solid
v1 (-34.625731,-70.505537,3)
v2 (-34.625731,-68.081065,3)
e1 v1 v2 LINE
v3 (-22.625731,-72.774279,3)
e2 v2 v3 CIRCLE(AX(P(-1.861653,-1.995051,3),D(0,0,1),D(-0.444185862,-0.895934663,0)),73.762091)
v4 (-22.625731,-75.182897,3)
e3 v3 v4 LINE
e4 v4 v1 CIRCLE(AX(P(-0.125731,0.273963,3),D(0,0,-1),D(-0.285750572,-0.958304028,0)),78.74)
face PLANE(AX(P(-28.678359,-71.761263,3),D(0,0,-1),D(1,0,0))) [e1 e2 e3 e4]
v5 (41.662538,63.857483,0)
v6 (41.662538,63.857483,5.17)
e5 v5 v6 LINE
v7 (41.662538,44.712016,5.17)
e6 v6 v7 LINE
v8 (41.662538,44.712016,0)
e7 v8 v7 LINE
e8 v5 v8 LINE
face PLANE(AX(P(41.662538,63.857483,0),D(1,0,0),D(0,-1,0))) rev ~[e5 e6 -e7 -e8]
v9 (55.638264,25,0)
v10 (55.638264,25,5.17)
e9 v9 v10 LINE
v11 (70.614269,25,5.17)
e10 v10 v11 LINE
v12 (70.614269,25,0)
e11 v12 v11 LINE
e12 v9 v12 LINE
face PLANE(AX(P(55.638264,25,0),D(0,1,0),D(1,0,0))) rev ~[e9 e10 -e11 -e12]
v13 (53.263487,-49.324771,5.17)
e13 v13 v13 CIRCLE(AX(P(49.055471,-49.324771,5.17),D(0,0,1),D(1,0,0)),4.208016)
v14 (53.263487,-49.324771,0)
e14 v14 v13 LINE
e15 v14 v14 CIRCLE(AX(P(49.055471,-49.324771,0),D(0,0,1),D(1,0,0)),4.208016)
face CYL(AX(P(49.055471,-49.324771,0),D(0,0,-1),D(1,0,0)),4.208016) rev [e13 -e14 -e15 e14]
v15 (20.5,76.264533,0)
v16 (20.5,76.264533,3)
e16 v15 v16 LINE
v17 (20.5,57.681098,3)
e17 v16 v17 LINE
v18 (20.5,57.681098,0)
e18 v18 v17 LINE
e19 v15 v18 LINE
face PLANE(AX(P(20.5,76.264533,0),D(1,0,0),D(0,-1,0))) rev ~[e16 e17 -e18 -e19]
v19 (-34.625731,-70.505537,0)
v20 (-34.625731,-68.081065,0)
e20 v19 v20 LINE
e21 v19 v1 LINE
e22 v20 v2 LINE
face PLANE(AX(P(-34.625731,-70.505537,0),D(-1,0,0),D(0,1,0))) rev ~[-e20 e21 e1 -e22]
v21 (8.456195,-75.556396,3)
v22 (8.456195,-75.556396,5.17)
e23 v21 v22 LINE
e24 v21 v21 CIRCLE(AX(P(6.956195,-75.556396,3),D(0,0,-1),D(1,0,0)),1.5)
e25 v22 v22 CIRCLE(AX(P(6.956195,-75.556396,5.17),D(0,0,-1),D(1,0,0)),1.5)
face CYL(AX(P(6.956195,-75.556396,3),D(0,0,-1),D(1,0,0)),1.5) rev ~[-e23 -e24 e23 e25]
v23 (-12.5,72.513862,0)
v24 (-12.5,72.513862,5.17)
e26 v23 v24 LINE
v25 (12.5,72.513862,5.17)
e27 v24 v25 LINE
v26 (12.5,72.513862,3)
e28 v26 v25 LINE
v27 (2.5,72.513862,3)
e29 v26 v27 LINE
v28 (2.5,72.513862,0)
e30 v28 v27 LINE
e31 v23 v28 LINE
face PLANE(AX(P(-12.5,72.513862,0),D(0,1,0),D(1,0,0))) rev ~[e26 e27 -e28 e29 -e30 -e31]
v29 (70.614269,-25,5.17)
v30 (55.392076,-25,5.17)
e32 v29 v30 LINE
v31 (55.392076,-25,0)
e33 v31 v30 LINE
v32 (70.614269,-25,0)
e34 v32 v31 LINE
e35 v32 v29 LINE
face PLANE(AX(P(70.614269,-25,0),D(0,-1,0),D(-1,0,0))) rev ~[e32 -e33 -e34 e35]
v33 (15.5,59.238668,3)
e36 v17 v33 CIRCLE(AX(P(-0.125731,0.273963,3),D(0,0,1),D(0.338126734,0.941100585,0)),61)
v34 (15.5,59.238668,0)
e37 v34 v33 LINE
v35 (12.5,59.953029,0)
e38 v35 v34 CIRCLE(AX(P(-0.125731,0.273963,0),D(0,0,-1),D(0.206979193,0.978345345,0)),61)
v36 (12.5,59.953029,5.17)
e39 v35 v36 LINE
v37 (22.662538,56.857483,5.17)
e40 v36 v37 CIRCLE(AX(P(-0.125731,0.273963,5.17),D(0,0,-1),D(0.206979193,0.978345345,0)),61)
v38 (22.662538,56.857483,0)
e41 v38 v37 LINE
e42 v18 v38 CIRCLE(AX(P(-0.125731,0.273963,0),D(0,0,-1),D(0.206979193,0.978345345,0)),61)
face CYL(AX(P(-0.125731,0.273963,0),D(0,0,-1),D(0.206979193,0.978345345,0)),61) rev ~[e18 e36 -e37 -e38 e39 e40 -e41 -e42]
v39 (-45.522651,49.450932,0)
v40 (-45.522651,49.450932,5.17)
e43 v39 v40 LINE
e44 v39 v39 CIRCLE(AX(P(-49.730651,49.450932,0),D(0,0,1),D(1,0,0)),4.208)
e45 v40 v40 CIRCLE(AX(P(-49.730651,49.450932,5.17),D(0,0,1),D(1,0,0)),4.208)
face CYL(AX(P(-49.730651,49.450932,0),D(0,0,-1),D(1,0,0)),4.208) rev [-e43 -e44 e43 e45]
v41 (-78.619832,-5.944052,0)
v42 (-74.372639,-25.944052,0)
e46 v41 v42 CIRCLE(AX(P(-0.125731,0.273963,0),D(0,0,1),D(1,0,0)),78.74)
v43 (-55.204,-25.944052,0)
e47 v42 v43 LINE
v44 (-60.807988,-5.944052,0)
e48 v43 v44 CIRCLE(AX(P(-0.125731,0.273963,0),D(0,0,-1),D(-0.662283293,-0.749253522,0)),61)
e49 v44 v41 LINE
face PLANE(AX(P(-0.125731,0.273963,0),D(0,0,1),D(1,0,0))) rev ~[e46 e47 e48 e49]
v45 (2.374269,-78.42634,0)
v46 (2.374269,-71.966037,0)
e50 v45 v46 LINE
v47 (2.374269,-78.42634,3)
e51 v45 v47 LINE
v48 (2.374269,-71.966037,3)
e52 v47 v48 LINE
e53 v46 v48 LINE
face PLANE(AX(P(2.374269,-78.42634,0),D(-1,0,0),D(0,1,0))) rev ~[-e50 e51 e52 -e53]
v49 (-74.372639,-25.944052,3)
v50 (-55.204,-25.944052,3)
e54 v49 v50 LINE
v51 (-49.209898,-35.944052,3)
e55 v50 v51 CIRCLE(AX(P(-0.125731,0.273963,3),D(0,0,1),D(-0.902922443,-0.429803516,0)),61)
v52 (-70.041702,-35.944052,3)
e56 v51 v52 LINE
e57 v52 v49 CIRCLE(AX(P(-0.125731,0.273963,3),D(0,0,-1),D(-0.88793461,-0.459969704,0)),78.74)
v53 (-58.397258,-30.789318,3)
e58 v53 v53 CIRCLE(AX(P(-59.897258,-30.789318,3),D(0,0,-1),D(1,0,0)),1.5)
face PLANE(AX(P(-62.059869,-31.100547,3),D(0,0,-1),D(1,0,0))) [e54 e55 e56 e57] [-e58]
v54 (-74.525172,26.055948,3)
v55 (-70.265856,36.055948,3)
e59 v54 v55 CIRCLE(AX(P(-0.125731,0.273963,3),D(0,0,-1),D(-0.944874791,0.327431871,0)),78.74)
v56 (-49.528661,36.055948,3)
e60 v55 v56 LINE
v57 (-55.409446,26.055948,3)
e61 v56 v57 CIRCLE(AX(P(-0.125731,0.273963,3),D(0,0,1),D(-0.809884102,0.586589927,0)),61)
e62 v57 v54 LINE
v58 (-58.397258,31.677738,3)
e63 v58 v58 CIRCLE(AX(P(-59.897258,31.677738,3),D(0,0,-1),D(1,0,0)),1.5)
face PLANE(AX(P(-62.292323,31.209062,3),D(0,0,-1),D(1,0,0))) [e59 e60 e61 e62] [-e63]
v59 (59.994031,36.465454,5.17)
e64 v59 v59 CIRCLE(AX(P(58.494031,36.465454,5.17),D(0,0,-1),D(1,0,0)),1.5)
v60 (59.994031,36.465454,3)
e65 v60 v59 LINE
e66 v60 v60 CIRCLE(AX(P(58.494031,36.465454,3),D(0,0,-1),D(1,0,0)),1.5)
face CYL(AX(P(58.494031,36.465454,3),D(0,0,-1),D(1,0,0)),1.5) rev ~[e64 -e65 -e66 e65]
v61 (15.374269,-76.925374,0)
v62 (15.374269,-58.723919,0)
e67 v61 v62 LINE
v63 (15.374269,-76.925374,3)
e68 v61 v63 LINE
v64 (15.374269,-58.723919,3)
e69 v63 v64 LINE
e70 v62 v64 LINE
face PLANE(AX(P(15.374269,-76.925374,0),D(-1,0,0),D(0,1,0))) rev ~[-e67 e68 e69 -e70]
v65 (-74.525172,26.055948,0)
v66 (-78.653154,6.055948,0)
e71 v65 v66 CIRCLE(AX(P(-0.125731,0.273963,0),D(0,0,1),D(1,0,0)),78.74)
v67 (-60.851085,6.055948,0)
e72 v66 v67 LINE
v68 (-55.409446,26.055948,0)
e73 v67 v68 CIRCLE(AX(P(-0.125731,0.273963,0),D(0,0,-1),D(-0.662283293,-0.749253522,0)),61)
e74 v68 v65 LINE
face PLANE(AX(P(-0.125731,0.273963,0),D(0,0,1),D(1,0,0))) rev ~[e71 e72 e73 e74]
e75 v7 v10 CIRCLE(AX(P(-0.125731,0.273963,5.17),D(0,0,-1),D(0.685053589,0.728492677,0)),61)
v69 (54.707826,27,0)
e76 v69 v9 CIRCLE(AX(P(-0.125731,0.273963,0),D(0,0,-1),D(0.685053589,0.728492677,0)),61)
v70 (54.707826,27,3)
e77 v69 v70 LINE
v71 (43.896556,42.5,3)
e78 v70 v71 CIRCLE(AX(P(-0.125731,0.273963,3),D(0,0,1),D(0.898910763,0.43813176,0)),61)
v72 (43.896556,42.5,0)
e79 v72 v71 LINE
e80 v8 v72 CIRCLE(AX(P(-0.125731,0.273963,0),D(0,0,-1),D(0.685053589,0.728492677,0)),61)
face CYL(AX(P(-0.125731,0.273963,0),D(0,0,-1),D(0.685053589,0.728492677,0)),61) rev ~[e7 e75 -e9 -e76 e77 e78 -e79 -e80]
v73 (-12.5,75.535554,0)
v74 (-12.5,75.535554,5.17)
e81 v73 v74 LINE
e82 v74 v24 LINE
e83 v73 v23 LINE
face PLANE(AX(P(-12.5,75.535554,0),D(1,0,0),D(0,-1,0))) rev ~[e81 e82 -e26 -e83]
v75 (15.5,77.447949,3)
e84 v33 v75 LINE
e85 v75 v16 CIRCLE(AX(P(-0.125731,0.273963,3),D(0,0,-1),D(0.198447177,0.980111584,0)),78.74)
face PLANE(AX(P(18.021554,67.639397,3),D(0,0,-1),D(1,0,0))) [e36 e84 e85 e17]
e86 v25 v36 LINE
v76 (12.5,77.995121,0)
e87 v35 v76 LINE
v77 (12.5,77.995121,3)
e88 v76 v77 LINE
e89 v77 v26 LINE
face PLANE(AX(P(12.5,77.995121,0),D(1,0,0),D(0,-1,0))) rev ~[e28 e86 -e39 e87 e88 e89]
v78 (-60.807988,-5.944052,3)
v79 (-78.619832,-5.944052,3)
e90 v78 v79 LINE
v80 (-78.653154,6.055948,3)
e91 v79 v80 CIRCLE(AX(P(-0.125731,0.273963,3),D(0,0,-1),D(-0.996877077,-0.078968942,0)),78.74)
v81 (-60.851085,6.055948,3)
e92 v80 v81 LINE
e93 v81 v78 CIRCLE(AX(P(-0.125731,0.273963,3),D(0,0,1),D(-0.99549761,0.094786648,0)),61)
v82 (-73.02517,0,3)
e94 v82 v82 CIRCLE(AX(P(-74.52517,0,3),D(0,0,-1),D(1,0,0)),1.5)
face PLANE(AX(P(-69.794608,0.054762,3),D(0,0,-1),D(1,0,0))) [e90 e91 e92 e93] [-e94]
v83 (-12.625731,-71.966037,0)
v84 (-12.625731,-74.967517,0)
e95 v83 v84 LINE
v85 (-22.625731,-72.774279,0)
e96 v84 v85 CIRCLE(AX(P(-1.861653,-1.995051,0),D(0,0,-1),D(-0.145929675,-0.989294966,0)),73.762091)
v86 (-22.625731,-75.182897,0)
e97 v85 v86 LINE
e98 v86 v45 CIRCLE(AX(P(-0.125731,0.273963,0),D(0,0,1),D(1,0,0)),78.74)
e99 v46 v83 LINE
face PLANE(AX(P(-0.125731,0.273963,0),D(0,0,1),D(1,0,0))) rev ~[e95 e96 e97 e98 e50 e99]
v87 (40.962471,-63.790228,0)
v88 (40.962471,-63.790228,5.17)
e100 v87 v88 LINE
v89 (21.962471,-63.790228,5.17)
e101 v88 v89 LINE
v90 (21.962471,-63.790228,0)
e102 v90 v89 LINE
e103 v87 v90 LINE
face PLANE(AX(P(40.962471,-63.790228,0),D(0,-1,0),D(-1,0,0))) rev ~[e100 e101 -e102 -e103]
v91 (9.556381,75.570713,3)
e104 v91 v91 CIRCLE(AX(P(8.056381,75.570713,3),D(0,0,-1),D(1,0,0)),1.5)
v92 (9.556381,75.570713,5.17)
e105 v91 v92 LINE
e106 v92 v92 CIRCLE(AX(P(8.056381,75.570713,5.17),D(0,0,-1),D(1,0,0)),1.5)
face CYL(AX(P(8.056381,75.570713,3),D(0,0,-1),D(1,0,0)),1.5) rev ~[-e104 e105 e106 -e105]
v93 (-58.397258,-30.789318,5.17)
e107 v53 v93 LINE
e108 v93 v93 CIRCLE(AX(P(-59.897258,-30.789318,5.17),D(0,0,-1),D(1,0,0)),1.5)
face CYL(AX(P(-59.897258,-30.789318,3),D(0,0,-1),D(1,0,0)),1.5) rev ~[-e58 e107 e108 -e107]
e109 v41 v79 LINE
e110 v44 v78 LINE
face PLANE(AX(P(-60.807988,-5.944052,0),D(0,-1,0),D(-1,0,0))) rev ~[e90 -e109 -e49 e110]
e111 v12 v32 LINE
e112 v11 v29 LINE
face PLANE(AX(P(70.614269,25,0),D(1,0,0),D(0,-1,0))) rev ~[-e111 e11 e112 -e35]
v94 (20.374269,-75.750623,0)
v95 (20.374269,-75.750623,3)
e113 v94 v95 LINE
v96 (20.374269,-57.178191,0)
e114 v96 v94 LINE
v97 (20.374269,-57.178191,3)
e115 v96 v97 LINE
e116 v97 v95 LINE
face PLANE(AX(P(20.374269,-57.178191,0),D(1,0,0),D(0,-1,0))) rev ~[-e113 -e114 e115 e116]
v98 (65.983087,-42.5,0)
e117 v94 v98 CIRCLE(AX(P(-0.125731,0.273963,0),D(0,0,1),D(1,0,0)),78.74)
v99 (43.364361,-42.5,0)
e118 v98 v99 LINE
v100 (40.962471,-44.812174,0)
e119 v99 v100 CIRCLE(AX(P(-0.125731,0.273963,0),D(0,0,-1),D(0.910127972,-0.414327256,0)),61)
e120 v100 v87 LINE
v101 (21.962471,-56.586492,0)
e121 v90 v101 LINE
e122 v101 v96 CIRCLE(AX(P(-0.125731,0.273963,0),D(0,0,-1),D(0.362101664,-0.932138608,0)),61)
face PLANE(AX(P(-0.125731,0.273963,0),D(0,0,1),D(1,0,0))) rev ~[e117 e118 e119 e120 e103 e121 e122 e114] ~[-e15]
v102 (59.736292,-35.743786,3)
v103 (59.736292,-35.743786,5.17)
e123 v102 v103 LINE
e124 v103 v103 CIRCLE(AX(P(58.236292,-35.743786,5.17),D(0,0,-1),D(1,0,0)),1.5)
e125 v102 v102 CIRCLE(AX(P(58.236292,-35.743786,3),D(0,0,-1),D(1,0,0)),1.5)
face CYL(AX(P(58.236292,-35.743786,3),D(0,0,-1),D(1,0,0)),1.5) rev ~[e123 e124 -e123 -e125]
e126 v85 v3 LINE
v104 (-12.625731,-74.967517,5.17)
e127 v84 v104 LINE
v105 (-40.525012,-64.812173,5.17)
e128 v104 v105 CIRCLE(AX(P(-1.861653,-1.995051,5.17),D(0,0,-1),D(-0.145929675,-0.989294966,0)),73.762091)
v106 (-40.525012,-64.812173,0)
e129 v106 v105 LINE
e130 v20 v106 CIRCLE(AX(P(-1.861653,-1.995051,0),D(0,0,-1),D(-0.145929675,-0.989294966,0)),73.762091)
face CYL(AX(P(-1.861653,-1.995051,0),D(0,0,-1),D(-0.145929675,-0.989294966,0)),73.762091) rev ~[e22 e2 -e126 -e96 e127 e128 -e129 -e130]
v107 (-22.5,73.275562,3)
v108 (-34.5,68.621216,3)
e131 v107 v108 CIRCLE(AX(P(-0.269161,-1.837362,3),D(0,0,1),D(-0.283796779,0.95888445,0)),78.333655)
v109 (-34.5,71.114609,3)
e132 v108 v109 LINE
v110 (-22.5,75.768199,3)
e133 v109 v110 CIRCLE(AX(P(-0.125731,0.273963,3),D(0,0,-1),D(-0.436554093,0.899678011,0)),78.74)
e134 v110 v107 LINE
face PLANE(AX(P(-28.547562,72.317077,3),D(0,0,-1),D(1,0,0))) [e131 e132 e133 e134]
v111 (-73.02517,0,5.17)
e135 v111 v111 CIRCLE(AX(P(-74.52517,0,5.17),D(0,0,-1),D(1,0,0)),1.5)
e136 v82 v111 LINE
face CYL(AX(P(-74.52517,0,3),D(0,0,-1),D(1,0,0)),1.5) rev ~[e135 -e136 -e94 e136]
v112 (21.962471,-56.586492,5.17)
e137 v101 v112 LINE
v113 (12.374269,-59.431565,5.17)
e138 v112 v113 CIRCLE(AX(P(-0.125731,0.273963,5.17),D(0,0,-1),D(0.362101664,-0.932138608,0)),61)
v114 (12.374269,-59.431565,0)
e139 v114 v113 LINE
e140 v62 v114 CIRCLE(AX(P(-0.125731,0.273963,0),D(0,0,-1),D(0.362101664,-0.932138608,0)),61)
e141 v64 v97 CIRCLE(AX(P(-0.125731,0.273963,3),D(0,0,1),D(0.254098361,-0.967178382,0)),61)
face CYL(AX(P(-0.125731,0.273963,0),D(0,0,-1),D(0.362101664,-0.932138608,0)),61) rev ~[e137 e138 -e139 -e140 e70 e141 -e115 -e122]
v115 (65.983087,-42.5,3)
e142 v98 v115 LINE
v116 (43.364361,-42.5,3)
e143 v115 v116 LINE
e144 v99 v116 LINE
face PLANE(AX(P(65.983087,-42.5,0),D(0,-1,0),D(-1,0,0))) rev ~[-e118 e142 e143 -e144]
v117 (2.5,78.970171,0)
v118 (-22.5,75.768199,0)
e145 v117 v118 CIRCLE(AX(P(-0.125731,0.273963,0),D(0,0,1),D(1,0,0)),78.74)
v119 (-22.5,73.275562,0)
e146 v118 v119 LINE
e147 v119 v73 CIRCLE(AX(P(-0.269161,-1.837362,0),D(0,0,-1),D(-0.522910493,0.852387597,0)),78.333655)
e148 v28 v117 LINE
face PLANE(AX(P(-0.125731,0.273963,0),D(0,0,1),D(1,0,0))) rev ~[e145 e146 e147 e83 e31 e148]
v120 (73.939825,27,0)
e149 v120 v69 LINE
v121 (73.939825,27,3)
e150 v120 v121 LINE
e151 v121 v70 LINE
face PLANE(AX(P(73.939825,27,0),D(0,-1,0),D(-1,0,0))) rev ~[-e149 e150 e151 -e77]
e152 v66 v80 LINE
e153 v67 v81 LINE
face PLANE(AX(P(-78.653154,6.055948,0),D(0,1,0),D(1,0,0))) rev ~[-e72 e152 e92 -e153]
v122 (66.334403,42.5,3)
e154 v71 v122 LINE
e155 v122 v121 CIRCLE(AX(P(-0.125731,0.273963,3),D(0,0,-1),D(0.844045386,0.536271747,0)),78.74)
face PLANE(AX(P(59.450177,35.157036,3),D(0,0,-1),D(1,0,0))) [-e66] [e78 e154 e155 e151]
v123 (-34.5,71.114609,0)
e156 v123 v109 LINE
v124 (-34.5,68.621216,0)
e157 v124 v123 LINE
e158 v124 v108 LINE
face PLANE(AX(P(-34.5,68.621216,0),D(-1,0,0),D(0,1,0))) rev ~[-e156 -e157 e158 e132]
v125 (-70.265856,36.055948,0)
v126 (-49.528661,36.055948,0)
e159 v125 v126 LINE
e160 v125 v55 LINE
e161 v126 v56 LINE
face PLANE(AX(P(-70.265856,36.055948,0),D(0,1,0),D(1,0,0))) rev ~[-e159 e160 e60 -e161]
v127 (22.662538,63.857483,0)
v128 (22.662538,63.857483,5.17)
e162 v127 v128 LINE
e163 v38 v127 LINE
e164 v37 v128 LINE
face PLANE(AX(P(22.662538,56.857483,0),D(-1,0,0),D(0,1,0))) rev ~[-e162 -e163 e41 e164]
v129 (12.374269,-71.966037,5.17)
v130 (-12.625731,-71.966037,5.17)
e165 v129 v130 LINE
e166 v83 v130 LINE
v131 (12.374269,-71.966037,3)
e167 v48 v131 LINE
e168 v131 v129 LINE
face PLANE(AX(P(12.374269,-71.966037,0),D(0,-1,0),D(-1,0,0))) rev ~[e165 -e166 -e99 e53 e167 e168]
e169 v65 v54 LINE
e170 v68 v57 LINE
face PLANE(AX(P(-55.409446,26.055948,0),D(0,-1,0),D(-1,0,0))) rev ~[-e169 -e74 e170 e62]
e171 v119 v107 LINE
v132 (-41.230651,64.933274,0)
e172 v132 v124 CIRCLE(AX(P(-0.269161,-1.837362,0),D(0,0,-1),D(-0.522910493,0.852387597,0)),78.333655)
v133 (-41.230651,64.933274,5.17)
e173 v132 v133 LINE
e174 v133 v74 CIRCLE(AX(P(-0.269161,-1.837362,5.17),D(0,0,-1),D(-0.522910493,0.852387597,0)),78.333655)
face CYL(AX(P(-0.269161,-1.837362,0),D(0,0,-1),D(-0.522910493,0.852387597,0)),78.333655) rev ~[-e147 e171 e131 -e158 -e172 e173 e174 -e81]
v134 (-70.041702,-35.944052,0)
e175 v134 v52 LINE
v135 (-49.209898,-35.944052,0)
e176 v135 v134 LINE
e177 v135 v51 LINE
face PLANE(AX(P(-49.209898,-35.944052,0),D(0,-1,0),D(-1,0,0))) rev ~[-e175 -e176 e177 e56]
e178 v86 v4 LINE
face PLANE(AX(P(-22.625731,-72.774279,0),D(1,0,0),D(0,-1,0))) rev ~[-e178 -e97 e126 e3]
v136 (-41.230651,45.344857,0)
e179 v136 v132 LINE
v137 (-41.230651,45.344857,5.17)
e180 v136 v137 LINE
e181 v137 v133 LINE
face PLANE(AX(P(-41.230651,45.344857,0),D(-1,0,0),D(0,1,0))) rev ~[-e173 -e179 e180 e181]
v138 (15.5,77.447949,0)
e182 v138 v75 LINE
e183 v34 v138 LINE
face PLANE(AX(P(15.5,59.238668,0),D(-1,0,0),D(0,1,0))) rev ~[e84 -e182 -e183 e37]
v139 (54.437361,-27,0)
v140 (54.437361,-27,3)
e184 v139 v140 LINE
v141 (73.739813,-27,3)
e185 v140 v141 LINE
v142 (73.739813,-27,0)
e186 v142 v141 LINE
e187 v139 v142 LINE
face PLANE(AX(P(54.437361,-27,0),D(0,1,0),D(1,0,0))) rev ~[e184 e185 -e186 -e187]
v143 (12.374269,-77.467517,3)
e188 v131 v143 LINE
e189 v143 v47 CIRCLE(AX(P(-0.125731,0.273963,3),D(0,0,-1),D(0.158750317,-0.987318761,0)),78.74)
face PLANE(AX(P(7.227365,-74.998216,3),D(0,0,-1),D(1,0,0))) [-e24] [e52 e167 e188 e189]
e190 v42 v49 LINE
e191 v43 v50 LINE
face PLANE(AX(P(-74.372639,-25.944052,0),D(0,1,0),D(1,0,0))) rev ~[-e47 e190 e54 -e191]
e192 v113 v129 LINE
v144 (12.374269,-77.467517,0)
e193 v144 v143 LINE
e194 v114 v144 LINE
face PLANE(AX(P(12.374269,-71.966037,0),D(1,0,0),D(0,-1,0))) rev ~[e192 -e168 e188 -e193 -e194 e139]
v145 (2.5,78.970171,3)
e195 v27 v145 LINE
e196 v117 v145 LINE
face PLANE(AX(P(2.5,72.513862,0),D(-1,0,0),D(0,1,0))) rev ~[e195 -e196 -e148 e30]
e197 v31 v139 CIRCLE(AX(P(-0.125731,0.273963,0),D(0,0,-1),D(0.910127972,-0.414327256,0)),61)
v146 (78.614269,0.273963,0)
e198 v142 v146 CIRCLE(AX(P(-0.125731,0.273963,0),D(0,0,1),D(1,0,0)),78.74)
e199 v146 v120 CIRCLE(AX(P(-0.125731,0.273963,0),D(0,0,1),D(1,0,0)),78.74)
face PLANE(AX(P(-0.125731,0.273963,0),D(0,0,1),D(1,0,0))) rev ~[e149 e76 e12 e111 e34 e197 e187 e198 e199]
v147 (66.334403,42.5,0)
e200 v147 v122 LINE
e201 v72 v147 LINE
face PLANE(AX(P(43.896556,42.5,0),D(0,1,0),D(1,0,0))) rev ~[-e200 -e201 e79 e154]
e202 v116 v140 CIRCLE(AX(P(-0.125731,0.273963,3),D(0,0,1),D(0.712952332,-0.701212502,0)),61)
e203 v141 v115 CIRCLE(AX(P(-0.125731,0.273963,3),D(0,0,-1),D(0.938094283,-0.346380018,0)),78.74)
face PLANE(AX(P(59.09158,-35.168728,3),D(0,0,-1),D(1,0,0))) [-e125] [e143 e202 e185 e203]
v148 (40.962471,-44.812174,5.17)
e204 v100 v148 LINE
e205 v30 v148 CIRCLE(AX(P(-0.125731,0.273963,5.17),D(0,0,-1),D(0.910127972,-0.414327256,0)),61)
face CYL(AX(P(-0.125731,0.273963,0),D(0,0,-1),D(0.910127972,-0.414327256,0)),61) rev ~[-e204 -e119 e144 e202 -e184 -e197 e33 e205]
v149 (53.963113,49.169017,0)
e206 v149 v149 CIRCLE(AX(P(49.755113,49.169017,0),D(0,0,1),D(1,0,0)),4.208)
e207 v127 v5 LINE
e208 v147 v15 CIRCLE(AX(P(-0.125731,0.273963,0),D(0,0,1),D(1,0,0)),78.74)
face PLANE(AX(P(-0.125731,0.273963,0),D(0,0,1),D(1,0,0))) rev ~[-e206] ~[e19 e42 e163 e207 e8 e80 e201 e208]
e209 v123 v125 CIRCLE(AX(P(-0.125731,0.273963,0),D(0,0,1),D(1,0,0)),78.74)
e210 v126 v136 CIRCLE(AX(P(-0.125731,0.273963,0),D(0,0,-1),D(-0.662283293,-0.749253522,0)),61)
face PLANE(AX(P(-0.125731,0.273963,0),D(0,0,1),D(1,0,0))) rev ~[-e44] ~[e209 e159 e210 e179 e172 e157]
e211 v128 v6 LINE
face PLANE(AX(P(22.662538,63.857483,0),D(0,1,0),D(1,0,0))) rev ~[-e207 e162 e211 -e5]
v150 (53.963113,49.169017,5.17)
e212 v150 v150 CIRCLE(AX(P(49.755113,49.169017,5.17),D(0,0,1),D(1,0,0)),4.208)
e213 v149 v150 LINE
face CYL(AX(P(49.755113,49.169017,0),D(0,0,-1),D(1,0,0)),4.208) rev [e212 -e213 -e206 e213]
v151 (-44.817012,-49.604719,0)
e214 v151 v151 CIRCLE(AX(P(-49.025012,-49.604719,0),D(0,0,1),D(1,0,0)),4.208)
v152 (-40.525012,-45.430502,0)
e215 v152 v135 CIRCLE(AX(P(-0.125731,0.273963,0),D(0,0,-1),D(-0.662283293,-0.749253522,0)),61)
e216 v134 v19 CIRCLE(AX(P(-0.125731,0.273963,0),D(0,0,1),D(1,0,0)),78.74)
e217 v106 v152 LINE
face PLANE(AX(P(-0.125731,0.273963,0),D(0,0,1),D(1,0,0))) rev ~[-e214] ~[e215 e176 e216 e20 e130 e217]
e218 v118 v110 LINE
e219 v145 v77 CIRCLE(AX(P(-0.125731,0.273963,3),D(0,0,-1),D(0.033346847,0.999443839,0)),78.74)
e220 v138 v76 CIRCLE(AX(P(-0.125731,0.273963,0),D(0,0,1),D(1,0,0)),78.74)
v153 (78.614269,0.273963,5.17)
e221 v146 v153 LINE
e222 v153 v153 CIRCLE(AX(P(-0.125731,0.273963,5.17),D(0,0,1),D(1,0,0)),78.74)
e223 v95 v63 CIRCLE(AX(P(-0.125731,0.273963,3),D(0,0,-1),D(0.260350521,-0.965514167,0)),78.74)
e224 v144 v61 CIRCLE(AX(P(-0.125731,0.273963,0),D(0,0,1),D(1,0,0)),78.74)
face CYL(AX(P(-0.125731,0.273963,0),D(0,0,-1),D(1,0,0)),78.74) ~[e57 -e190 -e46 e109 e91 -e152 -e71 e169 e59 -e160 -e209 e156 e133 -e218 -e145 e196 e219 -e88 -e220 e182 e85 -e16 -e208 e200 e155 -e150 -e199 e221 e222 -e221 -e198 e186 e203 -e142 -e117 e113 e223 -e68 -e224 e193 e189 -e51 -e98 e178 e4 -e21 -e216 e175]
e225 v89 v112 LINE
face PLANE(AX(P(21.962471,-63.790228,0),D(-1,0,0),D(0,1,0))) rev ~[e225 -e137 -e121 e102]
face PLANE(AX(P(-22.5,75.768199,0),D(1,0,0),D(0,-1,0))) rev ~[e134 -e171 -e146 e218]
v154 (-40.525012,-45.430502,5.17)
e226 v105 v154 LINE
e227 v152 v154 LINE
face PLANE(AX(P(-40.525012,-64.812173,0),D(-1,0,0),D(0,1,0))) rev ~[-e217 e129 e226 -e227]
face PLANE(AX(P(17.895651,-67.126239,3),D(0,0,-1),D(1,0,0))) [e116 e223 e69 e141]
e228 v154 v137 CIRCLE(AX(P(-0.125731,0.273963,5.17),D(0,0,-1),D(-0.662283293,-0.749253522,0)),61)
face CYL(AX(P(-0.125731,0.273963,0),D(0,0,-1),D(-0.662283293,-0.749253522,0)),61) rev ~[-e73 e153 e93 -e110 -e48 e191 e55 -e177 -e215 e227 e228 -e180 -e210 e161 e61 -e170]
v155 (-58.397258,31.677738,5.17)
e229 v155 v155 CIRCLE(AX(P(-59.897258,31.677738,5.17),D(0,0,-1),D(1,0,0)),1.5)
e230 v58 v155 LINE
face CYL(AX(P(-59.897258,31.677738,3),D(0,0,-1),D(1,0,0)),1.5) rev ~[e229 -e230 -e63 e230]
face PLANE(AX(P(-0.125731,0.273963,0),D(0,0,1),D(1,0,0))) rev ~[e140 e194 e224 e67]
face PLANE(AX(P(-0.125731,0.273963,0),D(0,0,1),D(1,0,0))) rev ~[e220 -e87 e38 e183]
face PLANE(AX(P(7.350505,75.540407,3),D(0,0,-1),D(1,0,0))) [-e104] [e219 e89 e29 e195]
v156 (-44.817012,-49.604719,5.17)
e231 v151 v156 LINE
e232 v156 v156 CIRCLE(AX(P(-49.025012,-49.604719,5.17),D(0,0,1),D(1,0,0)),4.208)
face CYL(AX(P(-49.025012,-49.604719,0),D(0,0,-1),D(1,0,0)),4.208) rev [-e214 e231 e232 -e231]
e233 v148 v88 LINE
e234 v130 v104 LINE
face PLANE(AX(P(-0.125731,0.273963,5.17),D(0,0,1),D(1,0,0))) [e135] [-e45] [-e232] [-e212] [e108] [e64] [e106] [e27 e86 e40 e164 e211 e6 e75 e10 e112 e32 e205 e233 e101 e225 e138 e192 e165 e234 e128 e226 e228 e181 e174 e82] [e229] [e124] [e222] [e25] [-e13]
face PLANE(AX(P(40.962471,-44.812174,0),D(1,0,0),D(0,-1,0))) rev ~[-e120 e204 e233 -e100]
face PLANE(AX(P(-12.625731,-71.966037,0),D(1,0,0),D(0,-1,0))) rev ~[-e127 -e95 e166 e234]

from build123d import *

# Parameters (mm, degrees)
F0_R     = 78.74
F0_R_2   = 4.208
F0_R_3   = 4.2080161266
F1_DEPTH = 5.17
F3_DEPTH = 3
F4_R     = 1.5
F5_DEPTH = 25


# Not quite as in the source:
# - a feature names something its author has since deleted; it is built from what else it names


with BuildPart() as f1:
    # F0 (on Top) → F1 (new body)
    with BuildSketch(Plane.XY):
        with Locations((-0.1257307514, 0.2739626218)):
            Circle(F0_R)
        with Locations((-49.0250116127, -49.6047185081)):
            Circle(F0_R_2, mode=Mode.SUBTRACT)
        with Locations((49.0554707364, -49.3247707953)):
            Circle(F0_R_3, mode=Mode.SUBTRACT)
        with Locations((-49.7306512766, 49.450932452)):
            Circle(F0_R_2, mode=Mode.SUBTRACT)
        with BuildLine():
            ThreePointArc((41.6625381497, 44.7120159348), (49.6362217188, 35.5549502263), (55.6382636856, 25))
            Line((55.6382636856, 25), (70.6142692486, 25))
            Line((70.6142692486, 25), (70.6142692486, -25))
            Line((70.6142692486, -25), (55.3920755218, -25))
            ThreePointArc((55.3920755218, -25), (49.182592498, -35.6382812281), (40.9624707364, -44.8121738117))
            Line((40.9624707364, -44.8121738117), (40.9624707364, -63.790228106))
            Line((40.9624707364, -63.790228106), (21.9624707364, -63.790228106))
            Line((21.9624707364, -63.790228106), (21.9624707364, -56.5864924857))
            ThreePointArc((21.9624707364, -56.5864924857), (17.2267771251, -58.2058669812), (12.3742692486, -59.4315647605))
            Line((12.3742692486, -59.4315647605), (12.3742692486, -71.9660373782))
            Line((12.3742692486, -71.9660373782), (-12.6257307514, -71.9660373782))
            Line((-12.6257307514, -71.9660373782), (-12.6257307514, -74.9675166541))
            ThreePointArc((-12.6257307514, -74.9675166541), (-27.09160778, -71.308076376), (-40.5250116127, -64.8121728344))
            Line((-40.5250116127, -64.8121728344), (-40.5250116127, -45.4305022137))
            ThreePointArc((-40.5250116127, -45.4305022137), (-61.1238878157, -0.2002048119), (-41.2306512766, 45.3448568731))
            Line((-41.2306512766, 45.3448568731), (-41.2306512766, 64.9332740284))
            ThreePointArc((-41.2306512766, 64.9332740284), (-27.3884909599, 71.6521165865), (-12.5, 75.5355537871))
            Line((-12.5, 75.5355537871), (-12.5, 72.5138622393))
            Line((-12.5, 72.5138622393), (0, 72.5138622393))
            Line((0, 72.5138622393), (12.5, 72.5138622393))
            Line((12.5, 72.5138622393), (12.5, 59.9530286583))
            ThreePointArc((12.5, 59.9530286583), (17.6487859305, 58.6269107626), (22.6625381497, 56.8574831953))
            Line((22.6625381497, 56.8574831953), (22.6625381497, 63.8574831953))
            Line((22.6625381497, 63.8574831953), (41.6625381497, 63.8574831953))
            Line((41.6625381497, 63.8574831953), (41.6625381497, 44.7120159348))
        make_face(mode=Mode.SUBTRACT)
        with Locations((49.75511293, 49.1690173001)):
            Circle(F0_R_2, mode=Mode.SUBTRACT)
    extrude(amount=F1_DEPTH)

    # F2 (on face) → F3 (cut)
    with BuildSketch(Plane(origin=(0, 0, 0), x_dir=(1, 0, 0), z_dir=(0, 0, -1))):
        with BuildLine():
            ThreePointArc((-22.6257307514, 75.1828965761), (-28.7215245435, 73.0899806842), (-34.6257307514, 70.5055372352))
            Line((-34.6257307514, 70.5055372352), (-34.6257307514, 68.081065471))
            ThreePointArc((-34.6257307514, 68.081065471), (-28.7284061022, 70.69020135), (-22.6257307514, 72.7742794712))
            Line((-22.6257307514, 72.7742794712), (-22.6257307514, 75.1828965761))
        make_face()
        with BuildLine():
            Line((-34.5, -68.6212157755), (-34.5, -71.1146092424))
            ThreePointArc((-34.5, -71.1146092424), (-28.5952430236, -73.6870028189), (-22.5, -75.7681986639))
            Line((-22.5, -75.7681986639), (-22.5, -73.2755617719))
            ThreePointArc((-22.5, -73.2755617719), (-28.595756362, -71.1952712241), (-34.5, -68.6212157755))
        make_face()
        with BuildLine():
            ThreePointArc((-49.5286609465, -36.0559481471), (-52.707319331, -31.1960670528), (-55.4094464584, -26.0559481471))
            Line((-55.4094464584, -26.0559481471), (-74.5251717599, -26.0559481471))
            ThreePointArc((-74.5251717599, -26.0559481471), (-72.5682702123, -31.1295306193), (-70.2658555864, -36.0559481471))
            Line((-70.2658555864, -36.0559481471), (-49.5286609465, -36.0559481471))
        make_face()
        with BuildLine():
            ThreePointArc((-60.8510849569, -6.0559481471), (-61.1253373513, -0.0548857934), (-60.807987598, 5.9440518529))
            Line((-60.807987598, 5.9440518529), (-78.6198317781, 5.9440518529))
            ThreePointArc((-78.6198317781, 5.9440518529), (-78.86542717, -0.0553124259), (-78.6531542631, -6.0559481471))
            Line((-78.6531542631, -6.0559481471), (-60.8510849569, -6.0559481471))
        make_face()
        with BuildLine():
            ThreePointArc((-55.2039997602, 25.9440518529), (-52.4464078958, 31.0875861785), (-49.2098975215, 35.9440518529))
            Line((-49.2098975215, 35.9440518529), (-70.0417019419, 35.9440518529))
            ThreePointArc((-70.0417019419, 35.9440518529), (-72.3803771023, 31.0190666452), (-74.3726385456, 25.9440518529))
            Line((-74.3726385456, 25.9440518529), (-55.2039997602, 25.9440518529))
        make_face()
        with BuildLine():
            Line((2.5, -72.5138622393), (2.5, -78.9701705229))
            ThreePointArc((2.5, -78.9701705229), (7.5155682015, -78.6423117834), (12.5, -77.9951214075))
            Line((12.5, -77.9951214075), (12.5, -72.5138622393))
            Line((12.5, -72.5138622393), (2.5, -72.5138622393))
        make_face()
        with BuildLine():
            ThreePointArc((12.3742692486, 77.4675166541), (7.3895759923, 78.1065691737), (2.3742692486, 78.4263397919))
            Line((2.3742692486, 78.4263397919), (2.3742692486, 71.9660373782))
            Line((2.3742692486, 71.9660373782), (12.3742692486, 71.9660373782))
            Line((12.3742692486, 71.9660373782), (12.3742692486, 77.4675166541))
        make_face()
        with BuildLine():
            ThreePointArc((20.3742692486, 75.7506228753), (17.8838503139, 76.3787776414), (15.3742692486, 76.9253741629))
            Line((15.3742692486, 76.9253741629), (15.3742692486, 58.7239186961))
            ThreePointArc((15.3742692486, 58.7239186961), (17.8908537815, 58.0047014138), (20.3742692486, 57.1781913848))
            Line((20.3742692486, 57.1781913848), (20.3742692486, 75.7506228753))
        make_face()
        with BuildLine():
            Line((15.5, -59.238668493), (15.5, -77.4479487731))
            ThreePointArc((15.5, -77.4479487731), (18.0096554679, -76.8970359527), (20.5, -76.2645332932))
            Line((20.5, -76.2645332932), (20.5, -57.6810983365))
            ThreePointArc((20.5, -57.6810983365), (18.0167228167, -58.5135658015), (15.5, -59.238668493))
        make_face()
        with BuildLine():
            ThreePointArc((66.3344029178, -42.5), (70.5632346959, -34.9590857149), (73.9398248467, -27))
            Line((73.9398248467, -27), (54.7078258181, -27))
            ThreePointArc((54.7078258181, -27), (49.9060787318, -35.1712123678), (43.8965564147, -42.5))
            Line((43.8965564147, -42.5), (66.3344029178, -42.5))
        make_face()
        with BuildLine():
            ThreePointArc((73.7398130624, 27), (70.2892388263, 34.9640801641), (65.9830865246, 42.5))
            Line((65.9830865246, 42.5), (43.3643614724, 42.5))
            ThreePointArc((43.3643614724, 42.5), (49.5096317795, 35.1848978566), (54.4373608299, 27))
            Line((54.4373608299, 27), (73.7398130624, 27))
        make_face()
    extrude(amount=-F3_DEPTH, mode=Mode.SUBTRACT)

    # F4 (on face) → F5 (cut)
    with BuildSketch(Plane(origin=(0, 0, 3), x_dir=(1, 0, 0), z_dir=(0, 0, -1))):
        with Locations((-74.5251700282, 0)):
            Circle(F4_R)
        with Locations((-59.8972582664, 30.7893175632)):
            Circle(F4_R)
        with Locations((-59.8972582664, -31.6777378321)):
            Circle(F4_R)
        with Locations((8.0563814701, -75.5707131466)):
            Circle(F4_R)
        with Locations((6.9561954952, 75.5563961955)):
            Circle(F4_R)
        with Locations((58.2362919726, 35.7437855263)):
            Circle(F4_R)
        with Locations((58.4940314293, -36.4654541612)):
            Circle(F4_R)
    extrude(amount=-F5_DEPTH, mode=Mode.SUBTRACT)


solid = f1.part
